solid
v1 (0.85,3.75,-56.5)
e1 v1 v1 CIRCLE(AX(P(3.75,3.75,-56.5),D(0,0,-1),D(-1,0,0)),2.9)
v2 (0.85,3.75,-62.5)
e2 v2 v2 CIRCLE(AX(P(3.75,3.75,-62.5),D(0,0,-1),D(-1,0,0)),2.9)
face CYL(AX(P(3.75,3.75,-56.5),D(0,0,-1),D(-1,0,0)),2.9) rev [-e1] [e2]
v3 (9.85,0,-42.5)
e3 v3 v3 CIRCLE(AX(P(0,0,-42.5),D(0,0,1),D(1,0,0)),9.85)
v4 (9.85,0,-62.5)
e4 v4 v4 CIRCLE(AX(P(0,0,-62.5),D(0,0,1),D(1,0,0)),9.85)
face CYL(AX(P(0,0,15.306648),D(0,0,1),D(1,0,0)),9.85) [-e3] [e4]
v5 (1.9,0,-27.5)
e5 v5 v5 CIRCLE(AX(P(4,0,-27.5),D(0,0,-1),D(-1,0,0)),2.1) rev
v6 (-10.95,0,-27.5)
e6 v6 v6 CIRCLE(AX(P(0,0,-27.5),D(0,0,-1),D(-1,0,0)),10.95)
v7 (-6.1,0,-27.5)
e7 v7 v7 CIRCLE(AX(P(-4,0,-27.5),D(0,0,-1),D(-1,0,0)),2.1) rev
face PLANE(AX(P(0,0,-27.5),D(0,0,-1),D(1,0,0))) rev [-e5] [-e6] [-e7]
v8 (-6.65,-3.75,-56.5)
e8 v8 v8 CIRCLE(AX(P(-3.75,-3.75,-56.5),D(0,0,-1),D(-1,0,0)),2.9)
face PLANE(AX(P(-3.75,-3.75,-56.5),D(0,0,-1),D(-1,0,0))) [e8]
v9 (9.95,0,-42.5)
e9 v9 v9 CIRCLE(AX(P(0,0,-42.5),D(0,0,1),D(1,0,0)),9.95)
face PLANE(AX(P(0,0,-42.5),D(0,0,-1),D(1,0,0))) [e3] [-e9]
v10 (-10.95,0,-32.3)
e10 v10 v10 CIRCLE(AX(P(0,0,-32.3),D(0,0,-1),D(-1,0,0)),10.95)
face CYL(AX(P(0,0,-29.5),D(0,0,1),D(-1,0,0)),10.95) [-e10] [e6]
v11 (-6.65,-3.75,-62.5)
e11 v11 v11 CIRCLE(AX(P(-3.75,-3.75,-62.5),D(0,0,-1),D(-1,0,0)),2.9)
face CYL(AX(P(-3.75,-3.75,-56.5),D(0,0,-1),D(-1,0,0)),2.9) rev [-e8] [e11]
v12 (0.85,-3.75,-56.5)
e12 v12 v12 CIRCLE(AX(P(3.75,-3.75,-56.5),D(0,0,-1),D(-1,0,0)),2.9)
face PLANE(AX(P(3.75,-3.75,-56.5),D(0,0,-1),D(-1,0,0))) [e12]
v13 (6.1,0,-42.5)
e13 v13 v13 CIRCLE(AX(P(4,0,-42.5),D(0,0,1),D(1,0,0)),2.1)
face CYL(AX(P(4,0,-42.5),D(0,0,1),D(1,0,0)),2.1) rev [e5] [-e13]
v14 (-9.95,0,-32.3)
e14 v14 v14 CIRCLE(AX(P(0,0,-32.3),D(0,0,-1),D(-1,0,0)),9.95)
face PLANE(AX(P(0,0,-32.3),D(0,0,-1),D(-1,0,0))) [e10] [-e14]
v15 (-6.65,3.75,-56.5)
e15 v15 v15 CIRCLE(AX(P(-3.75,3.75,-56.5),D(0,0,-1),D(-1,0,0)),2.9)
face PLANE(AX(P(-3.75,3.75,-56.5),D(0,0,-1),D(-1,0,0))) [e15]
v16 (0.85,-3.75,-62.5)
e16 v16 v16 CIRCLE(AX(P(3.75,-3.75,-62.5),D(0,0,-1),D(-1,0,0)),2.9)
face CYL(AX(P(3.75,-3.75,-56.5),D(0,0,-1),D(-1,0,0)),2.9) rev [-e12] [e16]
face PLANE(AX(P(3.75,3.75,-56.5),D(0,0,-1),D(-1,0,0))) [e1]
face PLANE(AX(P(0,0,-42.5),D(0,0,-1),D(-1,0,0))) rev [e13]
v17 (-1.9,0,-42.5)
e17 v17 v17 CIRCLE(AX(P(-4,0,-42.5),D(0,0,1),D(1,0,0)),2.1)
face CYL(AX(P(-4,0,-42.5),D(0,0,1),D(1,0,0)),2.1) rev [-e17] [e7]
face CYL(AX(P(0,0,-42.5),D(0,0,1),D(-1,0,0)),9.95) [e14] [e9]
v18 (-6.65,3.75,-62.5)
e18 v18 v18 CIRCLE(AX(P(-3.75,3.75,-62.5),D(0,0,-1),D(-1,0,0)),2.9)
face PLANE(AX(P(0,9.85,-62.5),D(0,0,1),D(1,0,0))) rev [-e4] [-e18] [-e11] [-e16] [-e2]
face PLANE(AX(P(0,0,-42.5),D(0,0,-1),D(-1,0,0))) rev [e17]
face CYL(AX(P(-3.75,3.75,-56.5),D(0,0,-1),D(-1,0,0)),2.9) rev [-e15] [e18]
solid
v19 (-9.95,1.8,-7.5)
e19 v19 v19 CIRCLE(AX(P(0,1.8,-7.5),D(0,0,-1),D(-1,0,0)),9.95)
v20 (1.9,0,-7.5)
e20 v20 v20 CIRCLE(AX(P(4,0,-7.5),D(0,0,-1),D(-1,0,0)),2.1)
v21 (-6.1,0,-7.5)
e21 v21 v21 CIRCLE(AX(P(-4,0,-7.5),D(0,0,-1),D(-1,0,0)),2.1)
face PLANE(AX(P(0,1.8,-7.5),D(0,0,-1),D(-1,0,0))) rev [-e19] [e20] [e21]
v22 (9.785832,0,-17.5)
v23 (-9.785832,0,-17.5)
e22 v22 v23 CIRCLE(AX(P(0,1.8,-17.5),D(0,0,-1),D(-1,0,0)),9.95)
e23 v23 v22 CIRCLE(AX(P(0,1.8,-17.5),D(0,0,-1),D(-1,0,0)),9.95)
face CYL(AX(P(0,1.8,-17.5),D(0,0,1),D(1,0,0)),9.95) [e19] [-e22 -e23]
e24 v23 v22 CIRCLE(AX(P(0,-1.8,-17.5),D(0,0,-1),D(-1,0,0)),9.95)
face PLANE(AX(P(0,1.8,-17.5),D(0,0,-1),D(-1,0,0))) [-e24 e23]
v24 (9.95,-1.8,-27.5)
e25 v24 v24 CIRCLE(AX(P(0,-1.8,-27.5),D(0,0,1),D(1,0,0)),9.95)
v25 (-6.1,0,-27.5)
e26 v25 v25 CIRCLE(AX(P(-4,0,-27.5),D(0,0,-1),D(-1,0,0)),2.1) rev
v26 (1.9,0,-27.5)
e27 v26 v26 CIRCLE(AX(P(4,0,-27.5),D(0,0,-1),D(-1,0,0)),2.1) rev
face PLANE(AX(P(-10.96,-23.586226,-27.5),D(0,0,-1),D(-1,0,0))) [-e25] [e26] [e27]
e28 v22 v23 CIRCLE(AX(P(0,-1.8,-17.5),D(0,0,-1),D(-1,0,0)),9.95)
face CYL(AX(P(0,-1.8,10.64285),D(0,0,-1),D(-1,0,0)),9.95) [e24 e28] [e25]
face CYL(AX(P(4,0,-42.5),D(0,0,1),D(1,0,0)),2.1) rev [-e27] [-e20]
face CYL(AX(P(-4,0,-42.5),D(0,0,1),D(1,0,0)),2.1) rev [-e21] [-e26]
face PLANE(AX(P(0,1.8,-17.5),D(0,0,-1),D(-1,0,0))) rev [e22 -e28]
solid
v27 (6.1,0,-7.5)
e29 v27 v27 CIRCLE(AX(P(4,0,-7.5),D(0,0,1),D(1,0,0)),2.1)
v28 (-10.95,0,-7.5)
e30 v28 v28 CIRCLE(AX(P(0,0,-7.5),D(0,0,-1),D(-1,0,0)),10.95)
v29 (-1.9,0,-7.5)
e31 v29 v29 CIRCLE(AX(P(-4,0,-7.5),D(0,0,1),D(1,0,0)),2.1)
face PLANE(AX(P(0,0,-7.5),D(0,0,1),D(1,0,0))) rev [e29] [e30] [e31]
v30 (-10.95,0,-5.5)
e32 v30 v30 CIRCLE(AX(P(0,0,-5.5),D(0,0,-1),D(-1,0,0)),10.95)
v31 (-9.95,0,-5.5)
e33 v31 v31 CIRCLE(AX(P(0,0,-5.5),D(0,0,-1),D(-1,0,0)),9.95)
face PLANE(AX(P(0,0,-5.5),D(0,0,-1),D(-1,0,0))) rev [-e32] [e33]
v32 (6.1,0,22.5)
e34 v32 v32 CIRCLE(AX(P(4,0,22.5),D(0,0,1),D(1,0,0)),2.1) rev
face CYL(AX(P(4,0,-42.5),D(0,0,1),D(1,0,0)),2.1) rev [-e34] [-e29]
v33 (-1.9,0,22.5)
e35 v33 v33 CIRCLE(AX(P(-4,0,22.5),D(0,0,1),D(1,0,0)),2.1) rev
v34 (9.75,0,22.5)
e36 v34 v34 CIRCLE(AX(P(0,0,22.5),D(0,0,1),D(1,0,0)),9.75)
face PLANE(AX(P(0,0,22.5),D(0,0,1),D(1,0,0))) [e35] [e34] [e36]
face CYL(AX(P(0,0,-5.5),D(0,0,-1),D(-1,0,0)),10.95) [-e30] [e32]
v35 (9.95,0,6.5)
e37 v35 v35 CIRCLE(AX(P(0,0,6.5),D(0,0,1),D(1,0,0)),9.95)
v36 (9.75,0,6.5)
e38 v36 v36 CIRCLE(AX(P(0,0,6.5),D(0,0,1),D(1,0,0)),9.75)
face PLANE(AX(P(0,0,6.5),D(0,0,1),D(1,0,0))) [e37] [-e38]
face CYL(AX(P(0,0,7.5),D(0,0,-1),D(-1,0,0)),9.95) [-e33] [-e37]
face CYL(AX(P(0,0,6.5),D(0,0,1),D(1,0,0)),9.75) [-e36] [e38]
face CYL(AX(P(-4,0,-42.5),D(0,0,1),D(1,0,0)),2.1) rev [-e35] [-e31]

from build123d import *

# Parameters (mm, degrees)
SKETCH1_R                   = 9.95
CENTRAL_INPUT_JOURNAL_DEPTH = 7.5
SKETCH8_R                   = 10.95
RIM_DEPTH                   = 2
SKETCH2_R                   = 9.95
ECCENTRIC_JOURNAL_DEPTH     = 10
BACK_START                  = 2.8
SKETCH16_R                  = 10.95
BACK_RIM_EXTENSION_DEPTH    = 2.8
SKETCH4_R                   = 9.95
ECCENTRIC_JOURNAL_2_DEPTH   = 10
M4_BOLTS_HOLE_DEPTH         = 46.433632917
M4_BOLTS_HOLE_DEPTH_BACK    = 46.433632917
SKETCH7_R                   = 2.1
SKETCH12_W                  = 20
SKETCH12_H                  = 9.85
SKETCH15_R                  = 2.9
INPUTTHREADEDINSERTS_DEPTH  = 6
FRONTJOURNALEXTENSION_START = 15
SKETCH14_R                  = 9.95
SKETCH14_R_2                = 2.1
FRONTJOURNALEXTENSION_DEPTH = 15
SKETCH17_R                  = 9.95
SKETCH17_R_2                = 9.75
OUTPUTTHROUGH_DEPTH         = 16


# Read off the part's stored shape, not the designer's step: Split1
with BuildPart() as part:
    # Sketch1 → Central Input Journal (new, symmetric)
    with BuildSketch(Plane.XY):
        Circle(SKETCH1_R)
    extrude(amount=CENTRAL_INPUT_JOURNAL_DEPTH, both=True)

    # Sketch8 → Rim (add)
    with BuildSketch(Plane(origin=(0, 0, -7.5), x_dir=(-1, 0, 0), z_dir=(0, 0, -1))):
        Circle(SKETCH8_R)
    extrude(amount=-RIM_DEPTH)


with BuildPart() as body_2:
    # Sketch2 → Eccentric Journal (new body)
    with BuildSketch(Plane(origin=(0, 0, -7.5), x_dir=(-1, 0, 0), z_dir=(0, 0, -1))):
        with Locations((0, 1.8)):
            Circle(SKETCH2_R)
    extrude(amount=ECCENTRIC_JOURNAL_DEPTH)



with BuildPart() as body_3:
    # Central Journal Back: mirrored copy
    add(part.part.mirror(Plane(origin=(0, 1.8, -17.5), x_dir=(1, 0, 0), z_dir=(0, 0, -1))))

    # Sketch16 → Back Rim Extension (add)
    with BuildSketch(Plane(origin=(0, 0, -29.5), x_dir=(-1, 0, 0), z_dir=(0, 0, -1)).offset(BACK_START)):
        Circle(SKETCH16_R)
    extrude(amount=-BACK_RIM_EXTENSION_DEPTH)


with BuildPart() as body_2_1:
    add(body_2.part)

    add(body_3.part)  # Eccentric Journal 2 merges body 3
    # Sketch4 → Eccentric Journal 2 (add)
    with BuildSketch(Plane.XY.offset(-27.5)):
        with Locations(Location((0, -1.8, 0), (0, 0, 169.577549887))):
            Circle(SKETCH4_R)
    extrude(amount=ECCENTRIC_JOURNAL_2_DEPTH)


with BuildPart() as m4_bolts_hole_tool:
    # Sketch7 → M4 Bolts Hole (new, two sides: drawn at the far end of the back side and taken through both)
    with BuildSketch(Plane.XY.offset(-M4_BOLTS_HOLE_DEPTH_BACK)):
        with Locations((-4, 0)):
            Circle(SKETCH7_R)
        with Locations((4, 0)):
            Circle(SKETCH7_R)
    extrude(amount=M4_BOLTS_HOLE_DEPTH + M4_BOLTS_HOLE_DEPTH_BACK)


with BuildPart() as part_1:
    add(part.part)

    # M4 Bolts Hole: cut by m4_bolts_hole_tool
    add(m4_bolts_hole_tool.part, mode=Mode.SUBTRACT)

    # Sketch14 → FrontJournalExtension (add)
    with BuildSketch(Plane.XY.offset(7.5).offset(FRONTJOURNALEXTENSION_START)):
        with Locations(Location((0, 0, 0), (0, 0, 180))):
            Circle(SKETCH14_R)
        with Locations((4, 0)):
            Circle(SKETCH14_R_2, mode=Mode.SUBTRACT)
        with Locations((-4, 0)):
            Circle(SKETCH14_R_2, mode=Mode.SUBTRACT)
    extrude(amount=-FRONTJOURNALEXTENSION_DEPTH)

    # Sketch17 → OutputThrough (cut)
    with BuildSketch(Plane.XY.offset(22.5)):
        with Locations(Location((0, 0, 0), (0, 0, 180))):
            Circle(SKETCH17_R)
        Circle(SKETCH17_R_2, mode=Mode.SUBTRACT)
    extrude(amount=-OUTPUTTHROUGH_DEPTH, mode=Mode.SUBTRACT)


with BuildPart() as body_2_2:
    add(body_2_1.part)

    # M4 Bolts Hole: cut by m4_bolts_hole_tool
    add(m4_bolts_hole_tool.part, mode=Mode.SUBTRACT)

    # Sketch12 → Input Shaft (revolve)
    with BuildSketch(Plane(origin=(0, 0, 0), x_dir=(0, 0, -1), z_dir=(1, 0, 0)), mode=Mode.PRIVATE) as input_shaft_sk:
        with Locations((52.5, 4.925)):
            Rectangle(SKETCH12_W, SKETCH12_H)
    revolve(input_shaft_sk.sketch.rotate(Axis((0, 0, 15.306648382), (0, 0, -1)), 270), axis=Axis((0, 0, 15.306648382), (0, 0, -1)))

    # Sketch15 → InputThreadedInserts (cut)
    with BuildSketch(Plane(origin=(0, 0, -62.5), x_dir=(-1, 0, 0), z_dir=(0, 0, -1))):
        with Locations((-3.75, 3.75)):
            Circle(SKETCH15_R)
        with Locations((3.75, 3.75)):
            Circle(SKETCH15_R)
        with Locations((3.75, -3.75)):
            Circle(SKETCH15_R)
        with Locations((-3.75, -3.75)):
            Circle(SKETCH15_R)
    extrude(amount=-INPUTTHREADEDINSERTS_DEPTH, mode=Mode.SUBTRACT)


with BuildPart() as body_3_2:
    # Split1: the piece on the far side of the plane
    add(body_2_2.part)
    split(bisect_by=Plane.XY.offset(-27.5), keep=Keep.BOTTOM)


with BuildPart() as body_2_3:
    add(body_2_2.part)

    # Split1
    split(bisect_by=Plane.XY.offset(-27.5), keep=Keep.TOP)


solid = Compound([part_1.part, body_3_2.part, body_2_3.part])
